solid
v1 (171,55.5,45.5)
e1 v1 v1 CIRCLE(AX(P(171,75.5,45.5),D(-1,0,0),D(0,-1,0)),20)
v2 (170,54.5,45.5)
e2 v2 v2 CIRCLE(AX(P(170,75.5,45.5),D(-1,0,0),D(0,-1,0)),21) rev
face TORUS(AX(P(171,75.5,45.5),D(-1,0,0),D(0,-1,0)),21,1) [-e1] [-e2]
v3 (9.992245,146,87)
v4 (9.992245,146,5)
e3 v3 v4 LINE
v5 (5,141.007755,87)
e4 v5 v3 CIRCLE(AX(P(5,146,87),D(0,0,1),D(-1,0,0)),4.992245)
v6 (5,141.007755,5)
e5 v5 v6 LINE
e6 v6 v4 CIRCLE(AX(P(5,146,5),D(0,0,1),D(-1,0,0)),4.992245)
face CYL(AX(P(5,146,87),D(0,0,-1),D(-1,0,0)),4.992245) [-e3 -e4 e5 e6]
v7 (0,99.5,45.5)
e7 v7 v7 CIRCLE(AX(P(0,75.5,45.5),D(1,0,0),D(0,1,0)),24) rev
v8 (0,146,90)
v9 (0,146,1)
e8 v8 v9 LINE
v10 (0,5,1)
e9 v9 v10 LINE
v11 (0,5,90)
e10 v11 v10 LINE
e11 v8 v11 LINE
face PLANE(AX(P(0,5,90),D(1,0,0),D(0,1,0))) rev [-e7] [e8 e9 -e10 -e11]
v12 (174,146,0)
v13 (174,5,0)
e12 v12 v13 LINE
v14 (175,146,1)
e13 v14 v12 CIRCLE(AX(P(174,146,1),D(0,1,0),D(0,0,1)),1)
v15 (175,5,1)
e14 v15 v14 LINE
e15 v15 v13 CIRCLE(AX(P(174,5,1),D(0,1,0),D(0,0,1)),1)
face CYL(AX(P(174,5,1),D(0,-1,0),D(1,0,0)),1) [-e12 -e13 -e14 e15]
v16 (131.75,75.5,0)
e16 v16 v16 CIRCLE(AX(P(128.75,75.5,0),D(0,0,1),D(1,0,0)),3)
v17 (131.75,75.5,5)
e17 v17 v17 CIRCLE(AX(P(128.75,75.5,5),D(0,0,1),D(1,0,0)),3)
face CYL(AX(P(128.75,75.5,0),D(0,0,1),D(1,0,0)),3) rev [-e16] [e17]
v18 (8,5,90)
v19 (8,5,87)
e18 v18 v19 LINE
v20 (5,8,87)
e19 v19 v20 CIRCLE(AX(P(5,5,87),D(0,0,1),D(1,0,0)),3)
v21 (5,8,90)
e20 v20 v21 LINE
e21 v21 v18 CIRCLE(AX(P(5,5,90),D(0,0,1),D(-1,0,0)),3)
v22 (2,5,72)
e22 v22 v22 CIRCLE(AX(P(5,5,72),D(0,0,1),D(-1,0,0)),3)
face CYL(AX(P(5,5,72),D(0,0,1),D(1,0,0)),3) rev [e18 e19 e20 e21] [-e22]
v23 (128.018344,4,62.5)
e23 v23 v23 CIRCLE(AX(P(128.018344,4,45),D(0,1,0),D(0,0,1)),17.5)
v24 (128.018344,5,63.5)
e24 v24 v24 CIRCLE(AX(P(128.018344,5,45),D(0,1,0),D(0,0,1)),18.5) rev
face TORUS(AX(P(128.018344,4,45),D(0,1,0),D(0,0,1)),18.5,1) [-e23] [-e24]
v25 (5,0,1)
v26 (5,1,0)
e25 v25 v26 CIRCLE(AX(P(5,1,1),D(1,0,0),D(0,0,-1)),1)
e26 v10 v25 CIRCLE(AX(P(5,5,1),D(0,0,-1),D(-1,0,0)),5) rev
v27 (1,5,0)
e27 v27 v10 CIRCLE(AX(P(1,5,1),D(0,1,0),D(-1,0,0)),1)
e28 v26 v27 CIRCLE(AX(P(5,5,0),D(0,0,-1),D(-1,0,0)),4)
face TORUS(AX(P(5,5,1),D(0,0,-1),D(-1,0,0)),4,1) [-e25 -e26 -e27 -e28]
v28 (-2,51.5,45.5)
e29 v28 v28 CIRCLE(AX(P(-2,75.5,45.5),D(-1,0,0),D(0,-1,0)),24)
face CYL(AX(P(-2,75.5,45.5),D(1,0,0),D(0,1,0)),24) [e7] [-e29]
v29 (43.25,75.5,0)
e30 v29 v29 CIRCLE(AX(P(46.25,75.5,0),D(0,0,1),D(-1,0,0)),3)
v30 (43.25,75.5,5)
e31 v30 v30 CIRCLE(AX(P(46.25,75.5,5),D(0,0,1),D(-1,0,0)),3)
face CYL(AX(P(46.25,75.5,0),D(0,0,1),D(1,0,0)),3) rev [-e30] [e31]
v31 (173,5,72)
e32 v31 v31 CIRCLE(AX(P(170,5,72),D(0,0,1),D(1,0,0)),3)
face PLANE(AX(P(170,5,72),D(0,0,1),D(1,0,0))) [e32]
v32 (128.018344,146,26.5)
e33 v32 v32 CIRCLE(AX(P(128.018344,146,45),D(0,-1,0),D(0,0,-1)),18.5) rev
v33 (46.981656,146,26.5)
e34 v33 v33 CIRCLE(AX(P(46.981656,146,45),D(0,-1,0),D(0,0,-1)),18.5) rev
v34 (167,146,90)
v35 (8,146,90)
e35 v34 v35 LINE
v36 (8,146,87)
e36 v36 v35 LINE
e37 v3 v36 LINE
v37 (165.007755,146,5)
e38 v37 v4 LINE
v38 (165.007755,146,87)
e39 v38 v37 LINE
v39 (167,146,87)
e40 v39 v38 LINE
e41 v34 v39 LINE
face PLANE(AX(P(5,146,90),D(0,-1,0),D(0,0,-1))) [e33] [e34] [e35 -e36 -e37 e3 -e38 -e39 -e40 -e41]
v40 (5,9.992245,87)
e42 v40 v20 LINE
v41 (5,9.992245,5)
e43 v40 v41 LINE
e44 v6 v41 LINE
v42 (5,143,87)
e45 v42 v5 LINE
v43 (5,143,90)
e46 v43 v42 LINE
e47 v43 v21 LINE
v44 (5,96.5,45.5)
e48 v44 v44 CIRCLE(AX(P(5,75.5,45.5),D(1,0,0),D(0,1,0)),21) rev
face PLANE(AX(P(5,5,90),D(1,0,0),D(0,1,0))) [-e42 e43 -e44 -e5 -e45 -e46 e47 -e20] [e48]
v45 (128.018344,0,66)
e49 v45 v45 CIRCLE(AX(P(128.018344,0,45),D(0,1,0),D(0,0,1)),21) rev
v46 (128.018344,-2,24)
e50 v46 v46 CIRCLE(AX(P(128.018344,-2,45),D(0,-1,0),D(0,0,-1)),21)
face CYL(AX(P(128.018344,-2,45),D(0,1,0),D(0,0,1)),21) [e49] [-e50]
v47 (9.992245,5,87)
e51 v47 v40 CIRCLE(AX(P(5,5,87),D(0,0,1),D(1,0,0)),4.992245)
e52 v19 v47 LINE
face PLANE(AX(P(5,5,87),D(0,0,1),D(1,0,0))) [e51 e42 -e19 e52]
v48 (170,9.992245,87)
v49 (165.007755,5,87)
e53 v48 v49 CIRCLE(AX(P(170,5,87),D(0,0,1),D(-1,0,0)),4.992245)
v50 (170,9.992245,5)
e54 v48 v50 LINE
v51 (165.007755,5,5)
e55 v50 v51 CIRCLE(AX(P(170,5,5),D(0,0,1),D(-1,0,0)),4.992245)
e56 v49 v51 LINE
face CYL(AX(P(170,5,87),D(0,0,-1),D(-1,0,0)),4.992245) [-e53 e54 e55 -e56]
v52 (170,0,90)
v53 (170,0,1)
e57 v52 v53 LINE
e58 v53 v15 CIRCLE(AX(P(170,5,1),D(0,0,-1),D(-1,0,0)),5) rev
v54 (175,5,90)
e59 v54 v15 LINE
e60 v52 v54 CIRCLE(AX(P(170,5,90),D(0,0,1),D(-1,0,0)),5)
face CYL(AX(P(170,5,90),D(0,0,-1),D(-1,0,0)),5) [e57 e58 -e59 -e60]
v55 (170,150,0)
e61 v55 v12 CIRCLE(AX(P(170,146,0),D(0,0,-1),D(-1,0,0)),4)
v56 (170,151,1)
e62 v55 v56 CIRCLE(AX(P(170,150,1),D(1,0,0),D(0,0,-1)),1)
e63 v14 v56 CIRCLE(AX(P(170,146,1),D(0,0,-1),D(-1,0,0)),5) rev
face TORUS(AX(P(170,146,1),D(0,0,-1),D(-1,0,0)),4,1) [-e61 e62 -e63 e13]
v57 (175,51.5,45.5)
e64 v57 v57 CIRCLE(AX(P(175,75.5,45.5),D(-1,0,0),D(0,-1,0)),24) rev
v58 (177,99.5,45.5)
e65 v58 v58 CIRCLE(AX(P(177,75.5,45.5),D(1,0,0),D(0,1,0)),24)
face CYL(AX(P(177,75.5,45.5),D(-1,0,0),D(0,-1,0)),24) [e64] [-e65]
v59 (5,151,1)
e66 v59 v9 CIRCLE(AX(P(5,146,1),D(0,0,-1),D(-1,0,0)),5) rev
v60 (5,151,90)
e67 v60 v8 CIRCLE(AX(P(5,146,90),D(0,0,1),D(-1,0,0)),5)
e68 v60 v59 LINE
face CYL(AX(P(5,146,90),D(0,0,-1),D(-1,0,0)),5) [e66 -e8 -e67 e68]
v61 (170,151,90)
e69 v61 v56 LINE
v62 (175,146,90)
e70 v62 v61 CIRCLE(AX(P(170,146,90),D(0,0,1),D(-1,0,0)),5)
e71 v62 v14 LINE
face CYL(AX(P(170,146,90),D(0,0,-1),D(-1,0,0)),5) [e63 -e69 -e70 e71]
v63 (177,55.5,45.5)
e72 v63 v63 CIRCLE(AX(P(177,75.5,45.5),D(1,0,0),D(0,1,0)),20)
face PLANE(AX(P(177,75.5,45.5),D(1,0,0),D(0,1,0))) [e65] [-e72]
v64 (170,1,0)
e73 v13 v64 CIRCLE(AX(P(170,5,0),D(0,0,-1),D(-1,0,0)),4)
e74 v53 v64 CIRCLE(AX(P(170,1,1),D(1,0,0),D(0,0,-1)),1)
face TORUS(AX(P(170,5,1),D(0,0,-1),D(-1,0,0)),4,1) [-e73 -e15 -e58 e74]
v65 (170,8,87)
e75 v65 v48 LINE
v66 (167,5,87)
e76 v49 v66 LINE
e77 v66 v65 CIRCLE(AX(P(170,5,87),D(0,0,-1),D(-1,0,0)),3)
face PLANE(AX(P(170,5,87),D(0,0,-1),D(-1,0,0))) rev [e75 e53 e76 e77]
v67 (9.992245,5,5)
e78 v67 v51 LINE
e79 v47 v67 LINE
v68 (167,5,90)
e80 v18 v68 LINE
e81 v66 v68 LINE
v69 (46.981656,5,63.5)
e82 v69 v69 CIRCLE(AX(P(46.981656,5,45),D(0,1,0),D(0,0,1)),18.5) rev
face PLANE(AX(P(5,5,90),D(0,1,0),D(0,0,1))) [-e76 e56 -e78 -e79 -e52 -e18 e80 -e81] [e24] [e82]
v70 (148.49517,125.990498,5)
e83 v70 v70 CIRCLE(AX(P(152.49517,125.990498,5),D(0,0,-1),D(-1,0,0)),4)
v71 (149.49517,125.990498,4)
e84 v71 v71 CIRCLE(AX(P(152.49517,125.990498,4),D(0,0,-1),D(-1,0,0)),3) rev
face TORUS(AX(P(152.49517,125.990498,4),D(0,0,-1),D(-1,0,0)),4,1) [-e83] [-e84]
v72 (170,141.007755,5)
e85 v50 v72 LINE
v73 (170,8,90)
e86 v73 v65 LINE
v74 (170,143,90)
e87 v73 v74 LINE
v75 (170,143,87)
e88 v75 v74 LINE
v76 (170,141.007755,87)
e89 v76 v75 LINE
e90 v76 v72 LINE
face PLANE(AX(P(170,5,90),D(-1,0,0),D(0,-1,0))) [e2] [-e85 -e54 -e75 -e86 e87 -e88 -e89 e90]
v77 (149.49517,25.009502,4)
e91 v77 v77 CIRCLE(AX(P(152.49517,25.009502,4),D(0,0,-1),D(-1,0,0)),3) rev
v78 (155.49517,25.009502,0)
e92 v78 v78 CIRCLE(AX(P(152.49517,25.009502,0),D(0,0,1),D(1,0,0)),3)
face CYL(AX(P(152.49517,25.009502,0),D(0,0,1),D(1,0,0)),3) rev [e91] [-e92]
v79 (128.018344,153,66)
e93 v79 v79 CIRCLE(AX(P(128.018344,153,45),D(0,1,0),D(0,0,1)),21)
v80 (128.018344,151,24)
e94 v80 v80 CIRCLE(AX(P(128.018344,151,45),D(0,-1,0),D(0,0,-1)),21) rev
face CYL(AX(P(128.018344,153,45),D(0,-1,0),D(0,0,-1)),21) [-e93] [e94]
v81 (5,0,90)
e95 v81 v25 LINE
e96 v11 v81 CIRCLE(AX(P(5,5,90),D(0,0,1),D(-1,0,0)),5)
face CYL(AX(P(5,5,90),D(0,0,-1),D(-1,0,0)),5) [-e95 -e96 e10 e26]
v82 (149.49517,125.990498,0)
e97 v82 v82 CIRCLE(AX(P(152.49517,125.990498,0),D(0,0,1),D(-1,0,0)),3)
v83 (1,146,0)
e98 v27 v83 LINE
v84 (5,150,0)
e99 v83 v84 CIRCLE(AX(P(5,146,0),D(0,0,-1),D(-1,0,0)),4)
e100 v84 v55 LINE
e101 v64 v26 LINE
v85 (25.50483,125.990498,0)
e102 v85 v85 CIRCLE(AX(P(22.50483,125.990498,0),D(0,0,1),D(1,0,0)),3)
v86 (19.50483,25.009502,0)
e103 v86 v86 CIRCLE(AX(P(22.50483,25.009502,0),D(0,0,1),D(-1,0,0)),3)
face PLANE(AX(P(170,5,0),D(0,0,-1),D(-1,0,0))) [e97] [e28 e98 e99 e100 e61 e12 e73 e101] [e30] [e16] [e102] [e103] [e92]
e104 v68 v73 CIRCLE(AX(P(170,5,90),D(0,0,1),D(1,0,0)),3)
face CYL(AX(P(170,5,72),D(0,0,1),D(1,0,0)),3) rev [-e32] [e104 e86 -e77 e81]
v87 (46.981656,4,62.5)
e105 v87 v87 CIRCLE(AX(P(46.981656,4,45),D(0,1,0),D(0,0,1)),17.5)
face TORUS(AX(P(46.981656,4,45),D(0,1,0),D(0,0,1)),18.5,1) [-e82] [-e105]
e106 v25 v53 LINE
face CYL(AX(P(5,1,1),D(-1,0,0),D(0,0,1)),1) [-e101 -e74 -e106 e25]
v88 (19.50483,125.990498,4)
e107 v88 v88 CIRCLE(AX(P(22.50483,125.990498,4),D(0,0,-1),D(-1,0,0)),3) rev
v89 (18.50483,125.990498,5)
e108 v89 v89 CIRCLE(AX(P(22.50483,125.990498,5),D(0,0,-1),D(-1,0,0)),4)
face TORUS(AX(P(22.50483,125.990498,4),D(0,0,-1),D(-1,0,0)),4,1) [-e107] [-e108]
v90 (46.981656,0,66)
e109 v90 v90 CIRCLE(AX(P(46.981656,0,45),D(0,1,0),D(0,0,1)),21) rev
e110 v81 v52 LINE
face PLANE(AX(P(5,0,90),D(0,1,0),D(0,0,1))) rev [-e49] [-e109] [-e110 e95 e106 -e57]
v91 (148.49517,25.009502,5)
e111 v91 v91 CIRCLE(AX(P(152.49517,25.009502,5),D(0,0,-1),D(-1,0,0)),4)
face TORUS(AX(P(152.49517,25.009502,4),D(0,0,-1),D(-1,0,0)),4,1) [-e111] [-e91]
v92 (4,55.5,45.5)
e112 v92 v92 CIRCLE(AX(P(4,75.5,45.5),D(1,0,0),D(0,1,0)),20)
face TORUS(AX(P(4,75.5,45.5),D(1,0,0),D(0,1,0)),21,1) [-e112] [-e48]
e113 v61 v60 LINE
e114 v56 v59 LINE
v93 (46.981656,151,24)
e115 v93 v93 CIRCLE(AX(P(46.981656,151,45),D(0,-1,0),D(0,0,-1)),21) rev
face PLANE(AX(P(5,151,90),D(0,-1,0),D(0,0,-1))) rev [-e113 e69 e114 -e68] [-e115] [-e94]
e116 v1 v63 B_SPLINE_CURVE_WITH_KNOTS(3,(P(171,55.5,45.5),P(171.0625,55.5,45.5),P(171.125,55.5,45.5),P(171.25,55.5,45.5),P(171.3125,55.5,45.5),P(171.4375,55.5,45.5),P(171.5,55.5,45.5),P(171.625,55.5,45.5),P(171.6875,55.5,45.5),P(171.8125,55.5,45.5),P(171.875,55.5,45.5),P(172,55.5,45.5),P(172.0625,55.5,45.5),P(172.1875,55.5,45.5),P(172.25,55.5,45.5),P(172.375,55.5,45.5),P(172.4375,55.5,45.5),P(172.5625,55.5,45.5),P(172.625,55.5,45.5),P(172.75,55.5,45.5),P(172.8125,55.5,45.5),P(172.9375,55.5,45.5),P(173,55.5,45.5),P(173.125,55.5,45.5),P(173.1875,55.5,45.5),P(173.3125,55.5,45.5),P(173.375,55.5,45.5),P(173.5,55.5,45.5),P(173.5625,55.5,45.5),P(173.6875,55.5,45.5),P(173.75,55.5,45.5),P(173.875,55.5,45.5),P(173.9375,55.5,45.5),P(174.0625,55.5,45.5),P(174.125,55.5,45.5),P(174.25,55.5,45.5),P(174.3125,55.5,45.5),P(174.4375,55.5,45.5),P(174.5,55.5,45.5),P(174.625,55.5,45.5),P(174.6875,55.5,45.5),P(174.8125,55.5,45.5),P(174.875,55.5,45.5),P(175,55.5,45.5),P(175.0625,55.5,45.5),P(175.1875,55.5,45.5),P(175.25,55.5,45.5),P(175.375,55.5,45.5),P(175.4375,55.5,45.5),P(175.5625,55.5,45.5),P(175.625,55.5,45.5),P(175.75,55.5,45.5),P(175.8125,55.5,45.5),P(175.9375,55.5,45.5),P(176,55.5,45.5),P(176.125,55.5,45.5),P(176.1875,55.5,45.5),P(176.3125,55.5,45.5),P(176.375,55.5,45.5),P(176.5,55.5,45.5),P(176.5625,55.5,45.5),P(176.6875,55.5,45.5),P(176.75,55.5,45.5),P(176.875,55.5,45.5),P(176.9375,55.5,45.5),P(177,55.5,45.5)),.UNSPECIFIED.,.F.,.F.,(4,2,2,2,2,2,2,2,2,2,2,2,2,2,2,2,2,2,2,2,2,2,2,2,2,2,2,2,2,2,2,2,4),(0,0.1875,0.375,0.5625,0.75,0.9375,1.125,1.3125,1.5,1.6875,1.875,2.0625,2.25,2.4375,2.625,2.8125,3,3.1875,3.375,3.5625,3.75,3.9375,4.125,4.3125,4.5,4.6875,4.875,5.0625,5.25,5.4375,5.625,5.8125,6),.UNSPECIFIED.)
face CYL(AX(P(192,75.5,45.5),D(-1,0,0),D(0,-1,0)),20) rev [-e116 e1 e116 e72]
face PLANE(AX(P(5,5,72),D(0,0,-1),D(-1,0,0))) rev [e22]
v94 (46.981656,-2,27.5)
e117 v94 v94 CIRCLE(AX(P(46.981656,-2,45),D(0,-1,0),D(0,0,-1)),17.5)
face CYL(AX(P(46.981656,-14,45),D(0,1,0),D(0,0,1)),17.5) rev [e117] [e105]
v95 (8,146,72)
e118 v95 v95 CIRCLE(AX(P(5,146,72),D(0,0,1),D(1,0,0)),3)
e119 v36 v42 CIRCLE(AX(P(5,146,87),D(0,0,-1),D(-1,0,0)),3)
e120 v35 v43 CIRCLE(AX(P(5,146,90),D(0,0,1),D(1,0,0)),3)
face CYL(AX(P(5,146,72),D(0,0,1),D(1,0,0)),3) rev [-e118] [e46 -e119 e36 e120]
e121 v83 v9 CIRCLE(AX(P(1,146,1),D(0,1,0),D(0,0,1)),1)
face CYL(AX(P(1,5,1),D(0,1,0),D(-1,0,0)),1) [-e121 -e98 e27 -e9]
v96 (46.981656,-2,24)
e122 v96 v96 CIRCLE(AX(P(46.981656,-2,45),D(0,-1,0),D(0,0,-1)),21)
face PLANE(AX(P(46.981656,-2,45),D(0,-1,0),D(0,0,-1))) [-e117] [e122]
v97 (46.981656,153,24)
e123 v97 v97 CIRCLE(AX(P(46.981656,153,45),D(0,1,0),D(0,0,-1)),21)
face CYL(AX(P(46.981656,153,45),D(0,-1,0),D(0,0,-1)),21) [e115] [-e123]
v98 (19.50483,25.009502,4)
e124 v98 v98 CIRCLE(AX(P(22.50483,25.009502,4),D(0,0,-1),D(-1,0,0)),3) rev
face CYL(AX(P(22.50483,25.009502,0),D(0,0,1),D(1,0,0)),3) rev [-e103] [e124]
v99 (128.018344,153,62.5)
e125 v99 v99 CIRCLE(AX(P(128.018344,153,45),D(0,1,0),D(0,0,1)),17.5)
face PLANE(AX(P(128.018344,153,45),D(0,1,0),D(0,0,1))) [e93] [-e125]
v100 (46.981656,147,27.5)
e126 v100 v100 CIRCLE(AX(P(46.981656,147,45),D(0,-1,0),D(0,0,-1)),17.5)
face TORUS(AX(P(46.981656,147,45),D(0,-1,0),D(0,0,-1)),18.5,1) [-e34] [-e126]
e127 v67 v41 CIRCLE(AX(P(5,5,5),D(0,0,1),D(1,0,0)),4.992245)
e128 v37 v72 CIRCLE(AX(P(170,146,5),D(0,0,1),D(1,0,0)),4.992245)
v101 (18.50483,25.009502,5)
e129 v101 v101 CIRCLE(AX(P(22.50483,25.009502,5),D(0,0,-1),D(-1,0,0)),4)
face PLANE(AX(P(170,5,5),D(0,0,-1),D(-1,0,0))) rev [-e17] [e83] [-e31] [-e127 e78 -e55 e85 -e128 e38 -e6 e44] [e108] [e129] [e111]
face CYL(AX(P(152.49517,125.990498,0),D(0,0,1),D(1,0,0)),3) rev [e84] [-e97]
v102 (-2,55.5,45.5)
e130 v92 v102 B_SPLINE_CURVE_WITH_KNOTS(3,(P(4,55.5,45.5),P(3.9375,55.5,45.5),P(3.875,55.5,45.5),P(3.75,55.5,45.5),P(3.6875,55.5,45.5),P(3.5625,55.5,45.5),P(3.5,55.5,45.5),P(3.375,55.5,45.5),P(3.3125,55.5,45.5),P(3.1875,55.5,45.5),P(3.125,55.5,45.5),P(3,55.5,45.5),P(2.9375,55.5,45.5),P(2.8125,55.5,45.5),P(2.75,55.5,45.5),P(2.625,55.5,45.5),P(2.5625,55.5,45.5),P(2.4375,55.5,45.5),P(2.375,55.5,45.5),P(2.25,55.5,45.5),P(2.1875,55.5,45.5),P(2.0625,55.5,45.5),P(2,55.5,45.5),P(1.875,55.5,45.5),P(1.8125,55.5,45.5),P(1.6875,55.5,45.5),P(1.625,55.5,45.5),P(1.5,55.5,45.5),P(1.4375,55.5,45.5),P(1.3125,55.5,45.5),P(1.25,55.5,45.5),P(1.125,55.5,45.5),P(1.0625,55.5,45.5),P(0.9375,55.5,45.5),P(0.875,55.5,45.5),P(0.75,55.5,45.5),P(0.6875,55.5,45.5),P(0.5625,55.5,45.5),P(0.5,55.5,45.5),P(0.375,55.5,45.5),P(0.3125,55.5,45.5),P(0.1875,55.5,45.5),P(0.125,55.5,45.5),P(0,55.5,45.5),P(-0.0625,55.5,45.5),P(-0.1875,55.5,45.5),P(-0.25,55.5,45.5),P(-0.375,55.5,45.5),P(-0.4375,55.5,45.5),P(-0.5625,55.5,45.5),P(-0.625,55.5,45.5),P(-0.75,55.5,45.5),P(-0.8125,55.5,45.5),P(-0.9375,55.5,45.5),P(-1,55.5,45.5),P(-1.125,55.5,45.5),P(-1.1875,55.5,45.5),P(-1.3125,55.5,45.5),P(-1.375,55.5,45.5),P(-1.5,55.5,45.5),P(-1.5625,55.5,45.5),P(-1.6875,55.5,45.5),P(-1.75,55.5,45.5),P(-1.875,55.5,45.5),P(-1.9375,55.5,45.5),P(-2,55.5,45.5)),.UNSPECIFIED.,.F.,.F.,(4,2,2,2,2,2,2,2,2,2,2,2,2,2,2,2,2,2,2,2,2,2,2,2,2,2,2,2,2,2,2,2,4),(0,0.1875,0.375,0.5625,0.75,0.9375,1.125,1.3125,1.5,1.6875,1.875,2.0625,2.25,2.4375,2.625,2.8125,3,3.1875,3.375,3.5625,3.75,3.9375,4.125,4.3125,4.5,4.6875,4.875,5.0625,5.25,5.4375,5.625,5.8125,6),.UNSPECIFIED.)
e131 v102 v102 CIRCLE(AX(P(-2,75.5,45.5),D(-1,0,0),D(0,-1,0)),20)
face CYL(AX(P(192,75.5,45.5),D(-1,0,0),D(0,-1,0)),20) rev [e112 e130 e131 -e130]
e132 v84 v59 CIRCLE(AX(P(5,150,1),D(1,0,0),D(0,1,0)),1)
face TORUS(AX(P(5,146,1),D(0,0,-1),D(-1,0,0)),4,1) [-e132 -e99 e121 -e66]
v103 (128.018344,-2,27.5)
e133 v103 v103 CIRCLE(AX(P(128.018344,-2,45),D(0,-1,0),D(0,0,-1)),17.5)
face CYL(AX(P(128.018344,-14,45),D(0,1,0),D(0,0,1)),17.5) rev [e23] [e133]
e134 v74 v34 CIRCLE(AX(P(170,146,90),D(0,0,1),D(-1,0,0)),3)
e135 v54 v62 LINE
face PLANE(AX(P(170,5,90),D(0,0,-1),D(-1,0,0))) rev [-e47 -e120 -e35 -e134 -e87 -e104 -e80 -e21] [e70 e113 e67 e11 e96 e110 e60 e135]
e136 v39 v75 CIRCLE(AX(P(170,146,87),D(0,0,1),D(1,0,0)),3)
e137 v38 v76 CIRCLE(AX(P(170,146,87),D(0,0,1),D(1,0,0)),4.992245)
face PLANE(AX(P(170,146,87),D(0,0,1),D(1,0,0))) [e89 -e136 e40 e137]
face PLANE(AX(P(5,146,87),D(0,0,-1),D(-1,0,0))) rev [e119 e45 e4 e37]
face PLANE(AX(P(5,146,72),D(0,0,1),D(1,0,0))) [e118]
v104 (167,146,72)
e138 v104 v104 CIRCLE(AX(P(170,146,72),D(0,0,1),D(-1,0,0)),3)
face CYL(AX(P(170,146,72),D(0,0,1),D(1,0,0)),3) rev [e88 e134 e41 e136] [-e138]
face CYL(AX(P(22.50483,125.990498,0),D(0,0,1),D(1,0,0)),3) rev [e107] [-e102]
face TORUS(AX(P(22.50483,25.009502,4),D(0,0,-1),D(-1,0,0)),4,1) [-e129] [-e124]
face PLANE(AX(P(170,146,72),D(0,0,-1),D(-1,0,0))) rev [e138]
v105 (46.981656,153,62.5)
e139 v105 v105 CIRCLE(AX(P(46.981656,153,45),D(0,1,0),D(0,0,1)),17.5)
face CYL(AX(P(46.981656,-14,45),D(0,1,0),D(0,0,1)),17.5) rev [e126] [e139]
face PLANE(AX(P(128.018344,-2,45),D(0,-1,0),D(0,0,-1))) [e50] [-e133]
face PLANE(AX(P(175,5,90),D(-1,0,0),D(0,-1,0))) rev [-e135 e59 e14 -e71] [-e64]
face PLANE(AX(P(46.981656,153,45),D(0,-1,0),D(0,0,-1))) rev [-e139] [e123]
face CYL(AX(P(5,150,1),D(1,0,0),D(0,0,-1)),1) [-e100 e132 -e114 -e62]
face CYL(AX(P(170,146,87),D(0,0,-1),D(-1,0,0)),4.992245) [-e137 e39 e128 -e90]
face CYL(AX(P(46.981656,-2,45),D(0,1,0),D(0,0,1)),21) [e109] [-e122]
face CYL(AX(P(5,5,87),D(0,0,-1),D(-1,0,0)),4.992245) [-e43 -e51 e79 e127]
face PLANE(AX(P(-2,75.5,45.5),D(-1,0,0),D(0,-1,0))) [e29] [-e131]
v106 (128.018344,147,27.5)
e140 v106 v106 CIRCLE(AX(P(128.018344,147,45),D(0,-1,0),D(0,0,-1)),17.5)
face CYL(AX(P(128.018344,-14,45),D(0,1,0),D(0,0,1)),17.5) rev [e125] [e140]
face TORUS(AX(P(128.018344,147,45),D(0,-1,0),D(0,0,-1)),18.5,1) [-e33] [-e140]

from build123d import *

# Parameters (mm, degrees)
BOSS_EXTRU_1_DEPTH      = 90
COQUE1_START            = 5
COQUE1_OUTLINE_W        = 141
COQUE1_OUTLINE_H        = 85
COQUE1_DEPTH            = 165
BOSS_EXTRU_2_DEPTH      = 82
ESQUISSE3_R             = 3
ENL_V_MAT_EXTRU_1_DEPTH = 18
ESQUISSE4_R             = 3
ENL_V_MAT_EXTRU_2_DEPTH = 5
ESQUISSE5_R             = 17.5
ENL_V_MAT_EXTRU_3_DEPTH = 165
BOSS_EXTRU_3_START      = 2
ESQUISSE7_R             = 21
ESQUISSE7_R_2           = 17.5
BOSS_EXTRU_3_DEPTH      = 2
ESQUISSE8_R             = 21
ESQUISSE8_R_2           = 17.5
BOSS_EXTRU_4_DEPTH      = 2
CONG_1_R                = 1
CONG_2_R                = 1
CONG_3_R                = 1
ESQUISSE9_R             = 20
ENL_V_MAT_EXTRU_4_DEPTH = 192
CONG_4_R                = 1
BOSS_EXTRU_5_START      = 2
ESQUISSE10_R            = 24
ESQUISSE10_R_2          = 20
BOSS_EXTRU_5_DEPTH      = 2
ESQUISSE11_R            = 24
ESQUISSE11_R_2          = 20
BOSS_EXTRU_6_DEPTH      = 2


# Read off the part's stored shape, not the designer's step: Coque1
with BuildPart() as part:
    # Esquisse1 → Boss.-Extru.1 (new body)
    with BuildSketch(Plane.XY):
        with BuildLine():
            Line((5, 0), (170, 0))
            ThreePointArc((170, 0), (173.535533906, 1.464466094), (175, 5))
            Line((175, 5), (175, 146))
            ThreePointArc((175, 146), (173.535533906, 149.535533906), (170, 151))
            Line((170, 151), (5, 151))
            ThreePointArc((5, 151), (1.464466094, 149.535533906), (0, 146))
            Line((0, 146), (0, 5))
            ThreePointArc((0, 5), (1.464466094, 1.464466094), (5, 0))
        make_face()
    extrude(amount=BOSS_EXTRU_1_DEPTH)

    # Coque1 outline → Coque1 (cut)
    with BuildSketch(Plane.YZ.offset(COQUE1_START)):
        with Locations((75.5, 47.5)):
            Rectangle(COQUE1_OUTLINE_W, COQUE1_OUTLINE_H)
    extrude(amount=COQUE1_DEPTH, mode=Mode.SUBTRACT)

    # Esquisse2 → Boss.-Extru.2 (add)
    with BuildSketch(Plane.XY.offset(5)):
        with BuildLine():
            Line((5, 141.007754636), (5, 146))
            Line((5, 146), (9.992245364, 146))
            ThreePointArc((9.992245364, 146), (8.53005055, 142.46994945), (5, 141.007754636))
        make_face()
        with BuildLine():
            Line((170, 146), (165.007754636, 146))
            ThreePointArc((165.007754636, 146), (166.46994945, 142.46994945), (170, 141.007754636))
            Line((170, 141.007754636), (170, 146))
        make_face()
        with BuildLine():
            Line((170, 5), (165.007754636, 5))
            ThreePointArc((165.007754636, 5), (166.46994945, 8.53005055), (170, 9.992245364))
            Line((170, 9.992245364), (170, 5))
        make_face()
        with BuildLine():
            Line((5, 9.992245364), (5, 5))
            Line((5, 5), (9.992245364, 5))
            ThreePointArc((9.992245364, 5), (8.53005055, 8.53005055), (5, 9.992245364))
        make_face()
    extrude(amount=BOSS_EXTRU_2_DEPTH)

    # Esquisse3 → Enlèv. mat.-Extru.1 (cut)
    with BuildSketch(Plane.XY.offset(90)):
        with Locations((5, 146)):
            Circle(ESQUISSE3_R)
        with Locations(Location((170, 146, 0), (0, 0, 180))):
            Circle(ESQUISSE3_R)
        with Locations((170, 5)):
            Circle(ESQUISSE3_R)
        with Locations((5, 5)):
            Circle(ESQUISSE3_R)
    extrude(amount=-ENL_V_MAT_EXTRU_1_DEPTH, mode=Mode.SUBTRACT)

    # Esquisse4 → Enlèv. mat.-Extru.2 (cut)
    with BuildSketch(Plane.XY.offset(5)):
        with Locations((22.504830405, 125.990498119)):
            Circle(ESQUISSE4_R)
        with Locations(Location((152.495169595, 125.990498119, 0), (0, 0, 180))):
            Circle(ESQUISSE4_R)
        with Locations((152.495169595, 25.009501881)):
            Circle(ESQUISSE4_R)
        with Locations(Location((22.504830405, 25.009501881, 0), (0, 0, 180))):
            Circle(ESQUISSE4_R)
        with Locations((128.75, 75.5)):
            Circle(ESQUISSE4_R)
        with Locations(Location((46.25, 75.5, 0), (0, 0, 180))):
            Circle(ESQUISSE4_R)
    extrude(amount=-ENL_V_MAT_EXTRU_2_DEPTH, mode=Mode.SUBTRACT)

    # Esquisse5 → Enlèv. mat.-Extru.3 (cut)
    with BuildSketch(Plane(origin=(0, 151, 0), x_dir=(1, 0, 0), z_dir=(0, 1, 0))):
        with Locations(Location((128.018344025, -45, 0), (0, 0, 270))):
            Circle(ESQUISSE5_R)
        with Locations(Location((46.981655975, -45, 0), (0, 0, 270))):
            Circle(ESQUISSE5_R)
    extrude(amount=-ENL_V_MAT_EXTRU_3_DEPTH, mode=Mode.SUBTRACT)

    # Esquisse7 → Boss.-Extru.3 (add)
    # profile 1 of 2: a face of its own
    with BuildSketch(Plane(origin=(0, 151, 0), x_dir=(1, 0, 0), z_dir=(0, 1, 0)).offset(BOSS_EXTRU_3_START)):
        with Locations(Location((128.018344025, -45, 0), (0, 0, 90))):
            Circle(ESQUISSE7_R)
        with Locations(Location((128.018344025, -45, 0), (0, 0, 270))):
            Circle(ESQUISSE7_R_2, mode=Mode.SUBTRACT)
    # profile 2 of 2: a face of its own
    with BuildSketch(Plane(origin=(0, 151, 0), x_dir=(1, 0, 0), z_dir=(0, 1, 0)).offset(BOSS_EXTRU_3_START)):
        with Locations(Location((46.981655975, -45, 0), (0, 0, 90))):
            Circle(ESQUISSE7_R)
        with Locations(Location((46.981655975, -45, 0), (0, 0, 270))):
            Circle(ESQUISSE7_R_2, mode=Mode.SUBTRACT)
    extrude(amount=-BOSS_EXTRU_3_DEPTH)

    # Esquisse8 → Boss.-Extru.4 (add)
    # profile 1 of 2: a face of its own
    with BuildSketch(Plane.XZ):
        with Locations(Location((46.981655975, 45, 0), (0, 0, 270))):
            Circle(ESQUISSE8_R)
        with Locations(Location((46.981655975, 45, 0), (0, 0, 90))):
            Circle(ESQUISSE8_R_2, mode=Mode.SUBTRACT)
    # profile 2 of 2: a face of its own
    with BuildSketch(Plane.XZ):
        with Locations(Location((128.018344025, 45, 0), (0, 0, 270))):
            Circle(ESQUISSE8_R)
        with Locations(Location((128.018344025, 45, 0), (0, 0, 90))):
            Circle(ESQUISSE8_R_2, mode=Mode.SUBTRACT)
    extrude(amount=BOSS_EXTRU_4_DEPTH)

    # Congé1
    cong_1_edges = [part.edges().sort_by_distance(p)[0] for p in [
        (128.018344025, 146, 27.5),
        (128.018344025, 5, 27.5),
        (46.981655975, 146, 27.5),
        (46.981655975, 5, 27.5),
    ]]
    fillet(cong_1_edges, radius=CONG_1_R)

    # Congé2
    cong_2_edges = [part.edges().sort_by_distance(p)[0] for p in [
        (155.495169595, 125.990498119, 5),
        (149.495169595, 25.009501881, 5),
        (25.504830405, 25.009501881, 5),
        (19.504830405, 125.990498119, 5),
    ]]
    fillet(cong_2_edges, radius=CONG_2_R)

    # Congé3
    cong_3_edges = [part.edges().sort_by_distance(p)[0] for p in [
        (87.5, 151, 0),
        (173.535533906, 149.535533906, 0),
        (175, 75.5, 0),
        (173.535533906, 1.464466094, 0),
        (87.5, 0, 0),
        (1.464466094, 1.464466094, 0),
        (0, 75.5, 0),
        (1.464466094, 149.535533906, 0),
    ]]
    fillet(cong_3_edges, radius=CONG_3_R)

    # Esquisse9 → Enlèv. mat.-Extru.4 (cut)
    with BuildSketch(Plane.ZY):
        with Locations(Location((45.5, 75.5, 0), (0, 0, 270))):
            Circle(ESQUISSE9_R)
    extrude(amount=-ENL_V_MAT_EXTRU_4_DEPTH, mode=Mode.SUBTRACT)

    # Congé4
    cong_4_edges = [part.edges().sort_by_distance(p)[0] for p in [
        (170, 95.5, 45.5),
        (5, 95.5, 45.5),
    ]]
    fillet(cong_4_edges, radius=CONG_4_R)

    # Esquisse10 → Boss.-Extru.5 (add)
    with BuildSketch(Plane.ZY.offset(BOSS_EXTRU_5_START)):
        with Locations(Location((45.5, 75.5, 0), (0, 0, 90))):
            Circle(ESQUISSE10_R)
        with Locations(Location((45.5, 75.5, 0), (0, 0, 270))):
            Circle(ESQUISSE10_R_2, mode=Mode.SUBTRACT)
    extrude(amount=-BOSS_EXTRU_5_DEPTH)

    # Esquisse11 → Boss.-Extru.6 (add)
    with BuildSketch(Plane(origin=(175, 0, 0), x_dir=(0, 0, -1), z_dir=(1, 0, 0))):
        with Locations(Location((-45.5, 75.5, 0), (0, 0, 90))):
            Circle(ESQUISSE11_R)
        with Locations(Location((-45.5, 75.5, 0), (0, 0, 270))):
            Circle(ESQUISSE11_R_2, mode=Mode.SUBTRACT)
    extrude(amount=BOSS_EXTRU_6_DEPTH)


solid = part.part
